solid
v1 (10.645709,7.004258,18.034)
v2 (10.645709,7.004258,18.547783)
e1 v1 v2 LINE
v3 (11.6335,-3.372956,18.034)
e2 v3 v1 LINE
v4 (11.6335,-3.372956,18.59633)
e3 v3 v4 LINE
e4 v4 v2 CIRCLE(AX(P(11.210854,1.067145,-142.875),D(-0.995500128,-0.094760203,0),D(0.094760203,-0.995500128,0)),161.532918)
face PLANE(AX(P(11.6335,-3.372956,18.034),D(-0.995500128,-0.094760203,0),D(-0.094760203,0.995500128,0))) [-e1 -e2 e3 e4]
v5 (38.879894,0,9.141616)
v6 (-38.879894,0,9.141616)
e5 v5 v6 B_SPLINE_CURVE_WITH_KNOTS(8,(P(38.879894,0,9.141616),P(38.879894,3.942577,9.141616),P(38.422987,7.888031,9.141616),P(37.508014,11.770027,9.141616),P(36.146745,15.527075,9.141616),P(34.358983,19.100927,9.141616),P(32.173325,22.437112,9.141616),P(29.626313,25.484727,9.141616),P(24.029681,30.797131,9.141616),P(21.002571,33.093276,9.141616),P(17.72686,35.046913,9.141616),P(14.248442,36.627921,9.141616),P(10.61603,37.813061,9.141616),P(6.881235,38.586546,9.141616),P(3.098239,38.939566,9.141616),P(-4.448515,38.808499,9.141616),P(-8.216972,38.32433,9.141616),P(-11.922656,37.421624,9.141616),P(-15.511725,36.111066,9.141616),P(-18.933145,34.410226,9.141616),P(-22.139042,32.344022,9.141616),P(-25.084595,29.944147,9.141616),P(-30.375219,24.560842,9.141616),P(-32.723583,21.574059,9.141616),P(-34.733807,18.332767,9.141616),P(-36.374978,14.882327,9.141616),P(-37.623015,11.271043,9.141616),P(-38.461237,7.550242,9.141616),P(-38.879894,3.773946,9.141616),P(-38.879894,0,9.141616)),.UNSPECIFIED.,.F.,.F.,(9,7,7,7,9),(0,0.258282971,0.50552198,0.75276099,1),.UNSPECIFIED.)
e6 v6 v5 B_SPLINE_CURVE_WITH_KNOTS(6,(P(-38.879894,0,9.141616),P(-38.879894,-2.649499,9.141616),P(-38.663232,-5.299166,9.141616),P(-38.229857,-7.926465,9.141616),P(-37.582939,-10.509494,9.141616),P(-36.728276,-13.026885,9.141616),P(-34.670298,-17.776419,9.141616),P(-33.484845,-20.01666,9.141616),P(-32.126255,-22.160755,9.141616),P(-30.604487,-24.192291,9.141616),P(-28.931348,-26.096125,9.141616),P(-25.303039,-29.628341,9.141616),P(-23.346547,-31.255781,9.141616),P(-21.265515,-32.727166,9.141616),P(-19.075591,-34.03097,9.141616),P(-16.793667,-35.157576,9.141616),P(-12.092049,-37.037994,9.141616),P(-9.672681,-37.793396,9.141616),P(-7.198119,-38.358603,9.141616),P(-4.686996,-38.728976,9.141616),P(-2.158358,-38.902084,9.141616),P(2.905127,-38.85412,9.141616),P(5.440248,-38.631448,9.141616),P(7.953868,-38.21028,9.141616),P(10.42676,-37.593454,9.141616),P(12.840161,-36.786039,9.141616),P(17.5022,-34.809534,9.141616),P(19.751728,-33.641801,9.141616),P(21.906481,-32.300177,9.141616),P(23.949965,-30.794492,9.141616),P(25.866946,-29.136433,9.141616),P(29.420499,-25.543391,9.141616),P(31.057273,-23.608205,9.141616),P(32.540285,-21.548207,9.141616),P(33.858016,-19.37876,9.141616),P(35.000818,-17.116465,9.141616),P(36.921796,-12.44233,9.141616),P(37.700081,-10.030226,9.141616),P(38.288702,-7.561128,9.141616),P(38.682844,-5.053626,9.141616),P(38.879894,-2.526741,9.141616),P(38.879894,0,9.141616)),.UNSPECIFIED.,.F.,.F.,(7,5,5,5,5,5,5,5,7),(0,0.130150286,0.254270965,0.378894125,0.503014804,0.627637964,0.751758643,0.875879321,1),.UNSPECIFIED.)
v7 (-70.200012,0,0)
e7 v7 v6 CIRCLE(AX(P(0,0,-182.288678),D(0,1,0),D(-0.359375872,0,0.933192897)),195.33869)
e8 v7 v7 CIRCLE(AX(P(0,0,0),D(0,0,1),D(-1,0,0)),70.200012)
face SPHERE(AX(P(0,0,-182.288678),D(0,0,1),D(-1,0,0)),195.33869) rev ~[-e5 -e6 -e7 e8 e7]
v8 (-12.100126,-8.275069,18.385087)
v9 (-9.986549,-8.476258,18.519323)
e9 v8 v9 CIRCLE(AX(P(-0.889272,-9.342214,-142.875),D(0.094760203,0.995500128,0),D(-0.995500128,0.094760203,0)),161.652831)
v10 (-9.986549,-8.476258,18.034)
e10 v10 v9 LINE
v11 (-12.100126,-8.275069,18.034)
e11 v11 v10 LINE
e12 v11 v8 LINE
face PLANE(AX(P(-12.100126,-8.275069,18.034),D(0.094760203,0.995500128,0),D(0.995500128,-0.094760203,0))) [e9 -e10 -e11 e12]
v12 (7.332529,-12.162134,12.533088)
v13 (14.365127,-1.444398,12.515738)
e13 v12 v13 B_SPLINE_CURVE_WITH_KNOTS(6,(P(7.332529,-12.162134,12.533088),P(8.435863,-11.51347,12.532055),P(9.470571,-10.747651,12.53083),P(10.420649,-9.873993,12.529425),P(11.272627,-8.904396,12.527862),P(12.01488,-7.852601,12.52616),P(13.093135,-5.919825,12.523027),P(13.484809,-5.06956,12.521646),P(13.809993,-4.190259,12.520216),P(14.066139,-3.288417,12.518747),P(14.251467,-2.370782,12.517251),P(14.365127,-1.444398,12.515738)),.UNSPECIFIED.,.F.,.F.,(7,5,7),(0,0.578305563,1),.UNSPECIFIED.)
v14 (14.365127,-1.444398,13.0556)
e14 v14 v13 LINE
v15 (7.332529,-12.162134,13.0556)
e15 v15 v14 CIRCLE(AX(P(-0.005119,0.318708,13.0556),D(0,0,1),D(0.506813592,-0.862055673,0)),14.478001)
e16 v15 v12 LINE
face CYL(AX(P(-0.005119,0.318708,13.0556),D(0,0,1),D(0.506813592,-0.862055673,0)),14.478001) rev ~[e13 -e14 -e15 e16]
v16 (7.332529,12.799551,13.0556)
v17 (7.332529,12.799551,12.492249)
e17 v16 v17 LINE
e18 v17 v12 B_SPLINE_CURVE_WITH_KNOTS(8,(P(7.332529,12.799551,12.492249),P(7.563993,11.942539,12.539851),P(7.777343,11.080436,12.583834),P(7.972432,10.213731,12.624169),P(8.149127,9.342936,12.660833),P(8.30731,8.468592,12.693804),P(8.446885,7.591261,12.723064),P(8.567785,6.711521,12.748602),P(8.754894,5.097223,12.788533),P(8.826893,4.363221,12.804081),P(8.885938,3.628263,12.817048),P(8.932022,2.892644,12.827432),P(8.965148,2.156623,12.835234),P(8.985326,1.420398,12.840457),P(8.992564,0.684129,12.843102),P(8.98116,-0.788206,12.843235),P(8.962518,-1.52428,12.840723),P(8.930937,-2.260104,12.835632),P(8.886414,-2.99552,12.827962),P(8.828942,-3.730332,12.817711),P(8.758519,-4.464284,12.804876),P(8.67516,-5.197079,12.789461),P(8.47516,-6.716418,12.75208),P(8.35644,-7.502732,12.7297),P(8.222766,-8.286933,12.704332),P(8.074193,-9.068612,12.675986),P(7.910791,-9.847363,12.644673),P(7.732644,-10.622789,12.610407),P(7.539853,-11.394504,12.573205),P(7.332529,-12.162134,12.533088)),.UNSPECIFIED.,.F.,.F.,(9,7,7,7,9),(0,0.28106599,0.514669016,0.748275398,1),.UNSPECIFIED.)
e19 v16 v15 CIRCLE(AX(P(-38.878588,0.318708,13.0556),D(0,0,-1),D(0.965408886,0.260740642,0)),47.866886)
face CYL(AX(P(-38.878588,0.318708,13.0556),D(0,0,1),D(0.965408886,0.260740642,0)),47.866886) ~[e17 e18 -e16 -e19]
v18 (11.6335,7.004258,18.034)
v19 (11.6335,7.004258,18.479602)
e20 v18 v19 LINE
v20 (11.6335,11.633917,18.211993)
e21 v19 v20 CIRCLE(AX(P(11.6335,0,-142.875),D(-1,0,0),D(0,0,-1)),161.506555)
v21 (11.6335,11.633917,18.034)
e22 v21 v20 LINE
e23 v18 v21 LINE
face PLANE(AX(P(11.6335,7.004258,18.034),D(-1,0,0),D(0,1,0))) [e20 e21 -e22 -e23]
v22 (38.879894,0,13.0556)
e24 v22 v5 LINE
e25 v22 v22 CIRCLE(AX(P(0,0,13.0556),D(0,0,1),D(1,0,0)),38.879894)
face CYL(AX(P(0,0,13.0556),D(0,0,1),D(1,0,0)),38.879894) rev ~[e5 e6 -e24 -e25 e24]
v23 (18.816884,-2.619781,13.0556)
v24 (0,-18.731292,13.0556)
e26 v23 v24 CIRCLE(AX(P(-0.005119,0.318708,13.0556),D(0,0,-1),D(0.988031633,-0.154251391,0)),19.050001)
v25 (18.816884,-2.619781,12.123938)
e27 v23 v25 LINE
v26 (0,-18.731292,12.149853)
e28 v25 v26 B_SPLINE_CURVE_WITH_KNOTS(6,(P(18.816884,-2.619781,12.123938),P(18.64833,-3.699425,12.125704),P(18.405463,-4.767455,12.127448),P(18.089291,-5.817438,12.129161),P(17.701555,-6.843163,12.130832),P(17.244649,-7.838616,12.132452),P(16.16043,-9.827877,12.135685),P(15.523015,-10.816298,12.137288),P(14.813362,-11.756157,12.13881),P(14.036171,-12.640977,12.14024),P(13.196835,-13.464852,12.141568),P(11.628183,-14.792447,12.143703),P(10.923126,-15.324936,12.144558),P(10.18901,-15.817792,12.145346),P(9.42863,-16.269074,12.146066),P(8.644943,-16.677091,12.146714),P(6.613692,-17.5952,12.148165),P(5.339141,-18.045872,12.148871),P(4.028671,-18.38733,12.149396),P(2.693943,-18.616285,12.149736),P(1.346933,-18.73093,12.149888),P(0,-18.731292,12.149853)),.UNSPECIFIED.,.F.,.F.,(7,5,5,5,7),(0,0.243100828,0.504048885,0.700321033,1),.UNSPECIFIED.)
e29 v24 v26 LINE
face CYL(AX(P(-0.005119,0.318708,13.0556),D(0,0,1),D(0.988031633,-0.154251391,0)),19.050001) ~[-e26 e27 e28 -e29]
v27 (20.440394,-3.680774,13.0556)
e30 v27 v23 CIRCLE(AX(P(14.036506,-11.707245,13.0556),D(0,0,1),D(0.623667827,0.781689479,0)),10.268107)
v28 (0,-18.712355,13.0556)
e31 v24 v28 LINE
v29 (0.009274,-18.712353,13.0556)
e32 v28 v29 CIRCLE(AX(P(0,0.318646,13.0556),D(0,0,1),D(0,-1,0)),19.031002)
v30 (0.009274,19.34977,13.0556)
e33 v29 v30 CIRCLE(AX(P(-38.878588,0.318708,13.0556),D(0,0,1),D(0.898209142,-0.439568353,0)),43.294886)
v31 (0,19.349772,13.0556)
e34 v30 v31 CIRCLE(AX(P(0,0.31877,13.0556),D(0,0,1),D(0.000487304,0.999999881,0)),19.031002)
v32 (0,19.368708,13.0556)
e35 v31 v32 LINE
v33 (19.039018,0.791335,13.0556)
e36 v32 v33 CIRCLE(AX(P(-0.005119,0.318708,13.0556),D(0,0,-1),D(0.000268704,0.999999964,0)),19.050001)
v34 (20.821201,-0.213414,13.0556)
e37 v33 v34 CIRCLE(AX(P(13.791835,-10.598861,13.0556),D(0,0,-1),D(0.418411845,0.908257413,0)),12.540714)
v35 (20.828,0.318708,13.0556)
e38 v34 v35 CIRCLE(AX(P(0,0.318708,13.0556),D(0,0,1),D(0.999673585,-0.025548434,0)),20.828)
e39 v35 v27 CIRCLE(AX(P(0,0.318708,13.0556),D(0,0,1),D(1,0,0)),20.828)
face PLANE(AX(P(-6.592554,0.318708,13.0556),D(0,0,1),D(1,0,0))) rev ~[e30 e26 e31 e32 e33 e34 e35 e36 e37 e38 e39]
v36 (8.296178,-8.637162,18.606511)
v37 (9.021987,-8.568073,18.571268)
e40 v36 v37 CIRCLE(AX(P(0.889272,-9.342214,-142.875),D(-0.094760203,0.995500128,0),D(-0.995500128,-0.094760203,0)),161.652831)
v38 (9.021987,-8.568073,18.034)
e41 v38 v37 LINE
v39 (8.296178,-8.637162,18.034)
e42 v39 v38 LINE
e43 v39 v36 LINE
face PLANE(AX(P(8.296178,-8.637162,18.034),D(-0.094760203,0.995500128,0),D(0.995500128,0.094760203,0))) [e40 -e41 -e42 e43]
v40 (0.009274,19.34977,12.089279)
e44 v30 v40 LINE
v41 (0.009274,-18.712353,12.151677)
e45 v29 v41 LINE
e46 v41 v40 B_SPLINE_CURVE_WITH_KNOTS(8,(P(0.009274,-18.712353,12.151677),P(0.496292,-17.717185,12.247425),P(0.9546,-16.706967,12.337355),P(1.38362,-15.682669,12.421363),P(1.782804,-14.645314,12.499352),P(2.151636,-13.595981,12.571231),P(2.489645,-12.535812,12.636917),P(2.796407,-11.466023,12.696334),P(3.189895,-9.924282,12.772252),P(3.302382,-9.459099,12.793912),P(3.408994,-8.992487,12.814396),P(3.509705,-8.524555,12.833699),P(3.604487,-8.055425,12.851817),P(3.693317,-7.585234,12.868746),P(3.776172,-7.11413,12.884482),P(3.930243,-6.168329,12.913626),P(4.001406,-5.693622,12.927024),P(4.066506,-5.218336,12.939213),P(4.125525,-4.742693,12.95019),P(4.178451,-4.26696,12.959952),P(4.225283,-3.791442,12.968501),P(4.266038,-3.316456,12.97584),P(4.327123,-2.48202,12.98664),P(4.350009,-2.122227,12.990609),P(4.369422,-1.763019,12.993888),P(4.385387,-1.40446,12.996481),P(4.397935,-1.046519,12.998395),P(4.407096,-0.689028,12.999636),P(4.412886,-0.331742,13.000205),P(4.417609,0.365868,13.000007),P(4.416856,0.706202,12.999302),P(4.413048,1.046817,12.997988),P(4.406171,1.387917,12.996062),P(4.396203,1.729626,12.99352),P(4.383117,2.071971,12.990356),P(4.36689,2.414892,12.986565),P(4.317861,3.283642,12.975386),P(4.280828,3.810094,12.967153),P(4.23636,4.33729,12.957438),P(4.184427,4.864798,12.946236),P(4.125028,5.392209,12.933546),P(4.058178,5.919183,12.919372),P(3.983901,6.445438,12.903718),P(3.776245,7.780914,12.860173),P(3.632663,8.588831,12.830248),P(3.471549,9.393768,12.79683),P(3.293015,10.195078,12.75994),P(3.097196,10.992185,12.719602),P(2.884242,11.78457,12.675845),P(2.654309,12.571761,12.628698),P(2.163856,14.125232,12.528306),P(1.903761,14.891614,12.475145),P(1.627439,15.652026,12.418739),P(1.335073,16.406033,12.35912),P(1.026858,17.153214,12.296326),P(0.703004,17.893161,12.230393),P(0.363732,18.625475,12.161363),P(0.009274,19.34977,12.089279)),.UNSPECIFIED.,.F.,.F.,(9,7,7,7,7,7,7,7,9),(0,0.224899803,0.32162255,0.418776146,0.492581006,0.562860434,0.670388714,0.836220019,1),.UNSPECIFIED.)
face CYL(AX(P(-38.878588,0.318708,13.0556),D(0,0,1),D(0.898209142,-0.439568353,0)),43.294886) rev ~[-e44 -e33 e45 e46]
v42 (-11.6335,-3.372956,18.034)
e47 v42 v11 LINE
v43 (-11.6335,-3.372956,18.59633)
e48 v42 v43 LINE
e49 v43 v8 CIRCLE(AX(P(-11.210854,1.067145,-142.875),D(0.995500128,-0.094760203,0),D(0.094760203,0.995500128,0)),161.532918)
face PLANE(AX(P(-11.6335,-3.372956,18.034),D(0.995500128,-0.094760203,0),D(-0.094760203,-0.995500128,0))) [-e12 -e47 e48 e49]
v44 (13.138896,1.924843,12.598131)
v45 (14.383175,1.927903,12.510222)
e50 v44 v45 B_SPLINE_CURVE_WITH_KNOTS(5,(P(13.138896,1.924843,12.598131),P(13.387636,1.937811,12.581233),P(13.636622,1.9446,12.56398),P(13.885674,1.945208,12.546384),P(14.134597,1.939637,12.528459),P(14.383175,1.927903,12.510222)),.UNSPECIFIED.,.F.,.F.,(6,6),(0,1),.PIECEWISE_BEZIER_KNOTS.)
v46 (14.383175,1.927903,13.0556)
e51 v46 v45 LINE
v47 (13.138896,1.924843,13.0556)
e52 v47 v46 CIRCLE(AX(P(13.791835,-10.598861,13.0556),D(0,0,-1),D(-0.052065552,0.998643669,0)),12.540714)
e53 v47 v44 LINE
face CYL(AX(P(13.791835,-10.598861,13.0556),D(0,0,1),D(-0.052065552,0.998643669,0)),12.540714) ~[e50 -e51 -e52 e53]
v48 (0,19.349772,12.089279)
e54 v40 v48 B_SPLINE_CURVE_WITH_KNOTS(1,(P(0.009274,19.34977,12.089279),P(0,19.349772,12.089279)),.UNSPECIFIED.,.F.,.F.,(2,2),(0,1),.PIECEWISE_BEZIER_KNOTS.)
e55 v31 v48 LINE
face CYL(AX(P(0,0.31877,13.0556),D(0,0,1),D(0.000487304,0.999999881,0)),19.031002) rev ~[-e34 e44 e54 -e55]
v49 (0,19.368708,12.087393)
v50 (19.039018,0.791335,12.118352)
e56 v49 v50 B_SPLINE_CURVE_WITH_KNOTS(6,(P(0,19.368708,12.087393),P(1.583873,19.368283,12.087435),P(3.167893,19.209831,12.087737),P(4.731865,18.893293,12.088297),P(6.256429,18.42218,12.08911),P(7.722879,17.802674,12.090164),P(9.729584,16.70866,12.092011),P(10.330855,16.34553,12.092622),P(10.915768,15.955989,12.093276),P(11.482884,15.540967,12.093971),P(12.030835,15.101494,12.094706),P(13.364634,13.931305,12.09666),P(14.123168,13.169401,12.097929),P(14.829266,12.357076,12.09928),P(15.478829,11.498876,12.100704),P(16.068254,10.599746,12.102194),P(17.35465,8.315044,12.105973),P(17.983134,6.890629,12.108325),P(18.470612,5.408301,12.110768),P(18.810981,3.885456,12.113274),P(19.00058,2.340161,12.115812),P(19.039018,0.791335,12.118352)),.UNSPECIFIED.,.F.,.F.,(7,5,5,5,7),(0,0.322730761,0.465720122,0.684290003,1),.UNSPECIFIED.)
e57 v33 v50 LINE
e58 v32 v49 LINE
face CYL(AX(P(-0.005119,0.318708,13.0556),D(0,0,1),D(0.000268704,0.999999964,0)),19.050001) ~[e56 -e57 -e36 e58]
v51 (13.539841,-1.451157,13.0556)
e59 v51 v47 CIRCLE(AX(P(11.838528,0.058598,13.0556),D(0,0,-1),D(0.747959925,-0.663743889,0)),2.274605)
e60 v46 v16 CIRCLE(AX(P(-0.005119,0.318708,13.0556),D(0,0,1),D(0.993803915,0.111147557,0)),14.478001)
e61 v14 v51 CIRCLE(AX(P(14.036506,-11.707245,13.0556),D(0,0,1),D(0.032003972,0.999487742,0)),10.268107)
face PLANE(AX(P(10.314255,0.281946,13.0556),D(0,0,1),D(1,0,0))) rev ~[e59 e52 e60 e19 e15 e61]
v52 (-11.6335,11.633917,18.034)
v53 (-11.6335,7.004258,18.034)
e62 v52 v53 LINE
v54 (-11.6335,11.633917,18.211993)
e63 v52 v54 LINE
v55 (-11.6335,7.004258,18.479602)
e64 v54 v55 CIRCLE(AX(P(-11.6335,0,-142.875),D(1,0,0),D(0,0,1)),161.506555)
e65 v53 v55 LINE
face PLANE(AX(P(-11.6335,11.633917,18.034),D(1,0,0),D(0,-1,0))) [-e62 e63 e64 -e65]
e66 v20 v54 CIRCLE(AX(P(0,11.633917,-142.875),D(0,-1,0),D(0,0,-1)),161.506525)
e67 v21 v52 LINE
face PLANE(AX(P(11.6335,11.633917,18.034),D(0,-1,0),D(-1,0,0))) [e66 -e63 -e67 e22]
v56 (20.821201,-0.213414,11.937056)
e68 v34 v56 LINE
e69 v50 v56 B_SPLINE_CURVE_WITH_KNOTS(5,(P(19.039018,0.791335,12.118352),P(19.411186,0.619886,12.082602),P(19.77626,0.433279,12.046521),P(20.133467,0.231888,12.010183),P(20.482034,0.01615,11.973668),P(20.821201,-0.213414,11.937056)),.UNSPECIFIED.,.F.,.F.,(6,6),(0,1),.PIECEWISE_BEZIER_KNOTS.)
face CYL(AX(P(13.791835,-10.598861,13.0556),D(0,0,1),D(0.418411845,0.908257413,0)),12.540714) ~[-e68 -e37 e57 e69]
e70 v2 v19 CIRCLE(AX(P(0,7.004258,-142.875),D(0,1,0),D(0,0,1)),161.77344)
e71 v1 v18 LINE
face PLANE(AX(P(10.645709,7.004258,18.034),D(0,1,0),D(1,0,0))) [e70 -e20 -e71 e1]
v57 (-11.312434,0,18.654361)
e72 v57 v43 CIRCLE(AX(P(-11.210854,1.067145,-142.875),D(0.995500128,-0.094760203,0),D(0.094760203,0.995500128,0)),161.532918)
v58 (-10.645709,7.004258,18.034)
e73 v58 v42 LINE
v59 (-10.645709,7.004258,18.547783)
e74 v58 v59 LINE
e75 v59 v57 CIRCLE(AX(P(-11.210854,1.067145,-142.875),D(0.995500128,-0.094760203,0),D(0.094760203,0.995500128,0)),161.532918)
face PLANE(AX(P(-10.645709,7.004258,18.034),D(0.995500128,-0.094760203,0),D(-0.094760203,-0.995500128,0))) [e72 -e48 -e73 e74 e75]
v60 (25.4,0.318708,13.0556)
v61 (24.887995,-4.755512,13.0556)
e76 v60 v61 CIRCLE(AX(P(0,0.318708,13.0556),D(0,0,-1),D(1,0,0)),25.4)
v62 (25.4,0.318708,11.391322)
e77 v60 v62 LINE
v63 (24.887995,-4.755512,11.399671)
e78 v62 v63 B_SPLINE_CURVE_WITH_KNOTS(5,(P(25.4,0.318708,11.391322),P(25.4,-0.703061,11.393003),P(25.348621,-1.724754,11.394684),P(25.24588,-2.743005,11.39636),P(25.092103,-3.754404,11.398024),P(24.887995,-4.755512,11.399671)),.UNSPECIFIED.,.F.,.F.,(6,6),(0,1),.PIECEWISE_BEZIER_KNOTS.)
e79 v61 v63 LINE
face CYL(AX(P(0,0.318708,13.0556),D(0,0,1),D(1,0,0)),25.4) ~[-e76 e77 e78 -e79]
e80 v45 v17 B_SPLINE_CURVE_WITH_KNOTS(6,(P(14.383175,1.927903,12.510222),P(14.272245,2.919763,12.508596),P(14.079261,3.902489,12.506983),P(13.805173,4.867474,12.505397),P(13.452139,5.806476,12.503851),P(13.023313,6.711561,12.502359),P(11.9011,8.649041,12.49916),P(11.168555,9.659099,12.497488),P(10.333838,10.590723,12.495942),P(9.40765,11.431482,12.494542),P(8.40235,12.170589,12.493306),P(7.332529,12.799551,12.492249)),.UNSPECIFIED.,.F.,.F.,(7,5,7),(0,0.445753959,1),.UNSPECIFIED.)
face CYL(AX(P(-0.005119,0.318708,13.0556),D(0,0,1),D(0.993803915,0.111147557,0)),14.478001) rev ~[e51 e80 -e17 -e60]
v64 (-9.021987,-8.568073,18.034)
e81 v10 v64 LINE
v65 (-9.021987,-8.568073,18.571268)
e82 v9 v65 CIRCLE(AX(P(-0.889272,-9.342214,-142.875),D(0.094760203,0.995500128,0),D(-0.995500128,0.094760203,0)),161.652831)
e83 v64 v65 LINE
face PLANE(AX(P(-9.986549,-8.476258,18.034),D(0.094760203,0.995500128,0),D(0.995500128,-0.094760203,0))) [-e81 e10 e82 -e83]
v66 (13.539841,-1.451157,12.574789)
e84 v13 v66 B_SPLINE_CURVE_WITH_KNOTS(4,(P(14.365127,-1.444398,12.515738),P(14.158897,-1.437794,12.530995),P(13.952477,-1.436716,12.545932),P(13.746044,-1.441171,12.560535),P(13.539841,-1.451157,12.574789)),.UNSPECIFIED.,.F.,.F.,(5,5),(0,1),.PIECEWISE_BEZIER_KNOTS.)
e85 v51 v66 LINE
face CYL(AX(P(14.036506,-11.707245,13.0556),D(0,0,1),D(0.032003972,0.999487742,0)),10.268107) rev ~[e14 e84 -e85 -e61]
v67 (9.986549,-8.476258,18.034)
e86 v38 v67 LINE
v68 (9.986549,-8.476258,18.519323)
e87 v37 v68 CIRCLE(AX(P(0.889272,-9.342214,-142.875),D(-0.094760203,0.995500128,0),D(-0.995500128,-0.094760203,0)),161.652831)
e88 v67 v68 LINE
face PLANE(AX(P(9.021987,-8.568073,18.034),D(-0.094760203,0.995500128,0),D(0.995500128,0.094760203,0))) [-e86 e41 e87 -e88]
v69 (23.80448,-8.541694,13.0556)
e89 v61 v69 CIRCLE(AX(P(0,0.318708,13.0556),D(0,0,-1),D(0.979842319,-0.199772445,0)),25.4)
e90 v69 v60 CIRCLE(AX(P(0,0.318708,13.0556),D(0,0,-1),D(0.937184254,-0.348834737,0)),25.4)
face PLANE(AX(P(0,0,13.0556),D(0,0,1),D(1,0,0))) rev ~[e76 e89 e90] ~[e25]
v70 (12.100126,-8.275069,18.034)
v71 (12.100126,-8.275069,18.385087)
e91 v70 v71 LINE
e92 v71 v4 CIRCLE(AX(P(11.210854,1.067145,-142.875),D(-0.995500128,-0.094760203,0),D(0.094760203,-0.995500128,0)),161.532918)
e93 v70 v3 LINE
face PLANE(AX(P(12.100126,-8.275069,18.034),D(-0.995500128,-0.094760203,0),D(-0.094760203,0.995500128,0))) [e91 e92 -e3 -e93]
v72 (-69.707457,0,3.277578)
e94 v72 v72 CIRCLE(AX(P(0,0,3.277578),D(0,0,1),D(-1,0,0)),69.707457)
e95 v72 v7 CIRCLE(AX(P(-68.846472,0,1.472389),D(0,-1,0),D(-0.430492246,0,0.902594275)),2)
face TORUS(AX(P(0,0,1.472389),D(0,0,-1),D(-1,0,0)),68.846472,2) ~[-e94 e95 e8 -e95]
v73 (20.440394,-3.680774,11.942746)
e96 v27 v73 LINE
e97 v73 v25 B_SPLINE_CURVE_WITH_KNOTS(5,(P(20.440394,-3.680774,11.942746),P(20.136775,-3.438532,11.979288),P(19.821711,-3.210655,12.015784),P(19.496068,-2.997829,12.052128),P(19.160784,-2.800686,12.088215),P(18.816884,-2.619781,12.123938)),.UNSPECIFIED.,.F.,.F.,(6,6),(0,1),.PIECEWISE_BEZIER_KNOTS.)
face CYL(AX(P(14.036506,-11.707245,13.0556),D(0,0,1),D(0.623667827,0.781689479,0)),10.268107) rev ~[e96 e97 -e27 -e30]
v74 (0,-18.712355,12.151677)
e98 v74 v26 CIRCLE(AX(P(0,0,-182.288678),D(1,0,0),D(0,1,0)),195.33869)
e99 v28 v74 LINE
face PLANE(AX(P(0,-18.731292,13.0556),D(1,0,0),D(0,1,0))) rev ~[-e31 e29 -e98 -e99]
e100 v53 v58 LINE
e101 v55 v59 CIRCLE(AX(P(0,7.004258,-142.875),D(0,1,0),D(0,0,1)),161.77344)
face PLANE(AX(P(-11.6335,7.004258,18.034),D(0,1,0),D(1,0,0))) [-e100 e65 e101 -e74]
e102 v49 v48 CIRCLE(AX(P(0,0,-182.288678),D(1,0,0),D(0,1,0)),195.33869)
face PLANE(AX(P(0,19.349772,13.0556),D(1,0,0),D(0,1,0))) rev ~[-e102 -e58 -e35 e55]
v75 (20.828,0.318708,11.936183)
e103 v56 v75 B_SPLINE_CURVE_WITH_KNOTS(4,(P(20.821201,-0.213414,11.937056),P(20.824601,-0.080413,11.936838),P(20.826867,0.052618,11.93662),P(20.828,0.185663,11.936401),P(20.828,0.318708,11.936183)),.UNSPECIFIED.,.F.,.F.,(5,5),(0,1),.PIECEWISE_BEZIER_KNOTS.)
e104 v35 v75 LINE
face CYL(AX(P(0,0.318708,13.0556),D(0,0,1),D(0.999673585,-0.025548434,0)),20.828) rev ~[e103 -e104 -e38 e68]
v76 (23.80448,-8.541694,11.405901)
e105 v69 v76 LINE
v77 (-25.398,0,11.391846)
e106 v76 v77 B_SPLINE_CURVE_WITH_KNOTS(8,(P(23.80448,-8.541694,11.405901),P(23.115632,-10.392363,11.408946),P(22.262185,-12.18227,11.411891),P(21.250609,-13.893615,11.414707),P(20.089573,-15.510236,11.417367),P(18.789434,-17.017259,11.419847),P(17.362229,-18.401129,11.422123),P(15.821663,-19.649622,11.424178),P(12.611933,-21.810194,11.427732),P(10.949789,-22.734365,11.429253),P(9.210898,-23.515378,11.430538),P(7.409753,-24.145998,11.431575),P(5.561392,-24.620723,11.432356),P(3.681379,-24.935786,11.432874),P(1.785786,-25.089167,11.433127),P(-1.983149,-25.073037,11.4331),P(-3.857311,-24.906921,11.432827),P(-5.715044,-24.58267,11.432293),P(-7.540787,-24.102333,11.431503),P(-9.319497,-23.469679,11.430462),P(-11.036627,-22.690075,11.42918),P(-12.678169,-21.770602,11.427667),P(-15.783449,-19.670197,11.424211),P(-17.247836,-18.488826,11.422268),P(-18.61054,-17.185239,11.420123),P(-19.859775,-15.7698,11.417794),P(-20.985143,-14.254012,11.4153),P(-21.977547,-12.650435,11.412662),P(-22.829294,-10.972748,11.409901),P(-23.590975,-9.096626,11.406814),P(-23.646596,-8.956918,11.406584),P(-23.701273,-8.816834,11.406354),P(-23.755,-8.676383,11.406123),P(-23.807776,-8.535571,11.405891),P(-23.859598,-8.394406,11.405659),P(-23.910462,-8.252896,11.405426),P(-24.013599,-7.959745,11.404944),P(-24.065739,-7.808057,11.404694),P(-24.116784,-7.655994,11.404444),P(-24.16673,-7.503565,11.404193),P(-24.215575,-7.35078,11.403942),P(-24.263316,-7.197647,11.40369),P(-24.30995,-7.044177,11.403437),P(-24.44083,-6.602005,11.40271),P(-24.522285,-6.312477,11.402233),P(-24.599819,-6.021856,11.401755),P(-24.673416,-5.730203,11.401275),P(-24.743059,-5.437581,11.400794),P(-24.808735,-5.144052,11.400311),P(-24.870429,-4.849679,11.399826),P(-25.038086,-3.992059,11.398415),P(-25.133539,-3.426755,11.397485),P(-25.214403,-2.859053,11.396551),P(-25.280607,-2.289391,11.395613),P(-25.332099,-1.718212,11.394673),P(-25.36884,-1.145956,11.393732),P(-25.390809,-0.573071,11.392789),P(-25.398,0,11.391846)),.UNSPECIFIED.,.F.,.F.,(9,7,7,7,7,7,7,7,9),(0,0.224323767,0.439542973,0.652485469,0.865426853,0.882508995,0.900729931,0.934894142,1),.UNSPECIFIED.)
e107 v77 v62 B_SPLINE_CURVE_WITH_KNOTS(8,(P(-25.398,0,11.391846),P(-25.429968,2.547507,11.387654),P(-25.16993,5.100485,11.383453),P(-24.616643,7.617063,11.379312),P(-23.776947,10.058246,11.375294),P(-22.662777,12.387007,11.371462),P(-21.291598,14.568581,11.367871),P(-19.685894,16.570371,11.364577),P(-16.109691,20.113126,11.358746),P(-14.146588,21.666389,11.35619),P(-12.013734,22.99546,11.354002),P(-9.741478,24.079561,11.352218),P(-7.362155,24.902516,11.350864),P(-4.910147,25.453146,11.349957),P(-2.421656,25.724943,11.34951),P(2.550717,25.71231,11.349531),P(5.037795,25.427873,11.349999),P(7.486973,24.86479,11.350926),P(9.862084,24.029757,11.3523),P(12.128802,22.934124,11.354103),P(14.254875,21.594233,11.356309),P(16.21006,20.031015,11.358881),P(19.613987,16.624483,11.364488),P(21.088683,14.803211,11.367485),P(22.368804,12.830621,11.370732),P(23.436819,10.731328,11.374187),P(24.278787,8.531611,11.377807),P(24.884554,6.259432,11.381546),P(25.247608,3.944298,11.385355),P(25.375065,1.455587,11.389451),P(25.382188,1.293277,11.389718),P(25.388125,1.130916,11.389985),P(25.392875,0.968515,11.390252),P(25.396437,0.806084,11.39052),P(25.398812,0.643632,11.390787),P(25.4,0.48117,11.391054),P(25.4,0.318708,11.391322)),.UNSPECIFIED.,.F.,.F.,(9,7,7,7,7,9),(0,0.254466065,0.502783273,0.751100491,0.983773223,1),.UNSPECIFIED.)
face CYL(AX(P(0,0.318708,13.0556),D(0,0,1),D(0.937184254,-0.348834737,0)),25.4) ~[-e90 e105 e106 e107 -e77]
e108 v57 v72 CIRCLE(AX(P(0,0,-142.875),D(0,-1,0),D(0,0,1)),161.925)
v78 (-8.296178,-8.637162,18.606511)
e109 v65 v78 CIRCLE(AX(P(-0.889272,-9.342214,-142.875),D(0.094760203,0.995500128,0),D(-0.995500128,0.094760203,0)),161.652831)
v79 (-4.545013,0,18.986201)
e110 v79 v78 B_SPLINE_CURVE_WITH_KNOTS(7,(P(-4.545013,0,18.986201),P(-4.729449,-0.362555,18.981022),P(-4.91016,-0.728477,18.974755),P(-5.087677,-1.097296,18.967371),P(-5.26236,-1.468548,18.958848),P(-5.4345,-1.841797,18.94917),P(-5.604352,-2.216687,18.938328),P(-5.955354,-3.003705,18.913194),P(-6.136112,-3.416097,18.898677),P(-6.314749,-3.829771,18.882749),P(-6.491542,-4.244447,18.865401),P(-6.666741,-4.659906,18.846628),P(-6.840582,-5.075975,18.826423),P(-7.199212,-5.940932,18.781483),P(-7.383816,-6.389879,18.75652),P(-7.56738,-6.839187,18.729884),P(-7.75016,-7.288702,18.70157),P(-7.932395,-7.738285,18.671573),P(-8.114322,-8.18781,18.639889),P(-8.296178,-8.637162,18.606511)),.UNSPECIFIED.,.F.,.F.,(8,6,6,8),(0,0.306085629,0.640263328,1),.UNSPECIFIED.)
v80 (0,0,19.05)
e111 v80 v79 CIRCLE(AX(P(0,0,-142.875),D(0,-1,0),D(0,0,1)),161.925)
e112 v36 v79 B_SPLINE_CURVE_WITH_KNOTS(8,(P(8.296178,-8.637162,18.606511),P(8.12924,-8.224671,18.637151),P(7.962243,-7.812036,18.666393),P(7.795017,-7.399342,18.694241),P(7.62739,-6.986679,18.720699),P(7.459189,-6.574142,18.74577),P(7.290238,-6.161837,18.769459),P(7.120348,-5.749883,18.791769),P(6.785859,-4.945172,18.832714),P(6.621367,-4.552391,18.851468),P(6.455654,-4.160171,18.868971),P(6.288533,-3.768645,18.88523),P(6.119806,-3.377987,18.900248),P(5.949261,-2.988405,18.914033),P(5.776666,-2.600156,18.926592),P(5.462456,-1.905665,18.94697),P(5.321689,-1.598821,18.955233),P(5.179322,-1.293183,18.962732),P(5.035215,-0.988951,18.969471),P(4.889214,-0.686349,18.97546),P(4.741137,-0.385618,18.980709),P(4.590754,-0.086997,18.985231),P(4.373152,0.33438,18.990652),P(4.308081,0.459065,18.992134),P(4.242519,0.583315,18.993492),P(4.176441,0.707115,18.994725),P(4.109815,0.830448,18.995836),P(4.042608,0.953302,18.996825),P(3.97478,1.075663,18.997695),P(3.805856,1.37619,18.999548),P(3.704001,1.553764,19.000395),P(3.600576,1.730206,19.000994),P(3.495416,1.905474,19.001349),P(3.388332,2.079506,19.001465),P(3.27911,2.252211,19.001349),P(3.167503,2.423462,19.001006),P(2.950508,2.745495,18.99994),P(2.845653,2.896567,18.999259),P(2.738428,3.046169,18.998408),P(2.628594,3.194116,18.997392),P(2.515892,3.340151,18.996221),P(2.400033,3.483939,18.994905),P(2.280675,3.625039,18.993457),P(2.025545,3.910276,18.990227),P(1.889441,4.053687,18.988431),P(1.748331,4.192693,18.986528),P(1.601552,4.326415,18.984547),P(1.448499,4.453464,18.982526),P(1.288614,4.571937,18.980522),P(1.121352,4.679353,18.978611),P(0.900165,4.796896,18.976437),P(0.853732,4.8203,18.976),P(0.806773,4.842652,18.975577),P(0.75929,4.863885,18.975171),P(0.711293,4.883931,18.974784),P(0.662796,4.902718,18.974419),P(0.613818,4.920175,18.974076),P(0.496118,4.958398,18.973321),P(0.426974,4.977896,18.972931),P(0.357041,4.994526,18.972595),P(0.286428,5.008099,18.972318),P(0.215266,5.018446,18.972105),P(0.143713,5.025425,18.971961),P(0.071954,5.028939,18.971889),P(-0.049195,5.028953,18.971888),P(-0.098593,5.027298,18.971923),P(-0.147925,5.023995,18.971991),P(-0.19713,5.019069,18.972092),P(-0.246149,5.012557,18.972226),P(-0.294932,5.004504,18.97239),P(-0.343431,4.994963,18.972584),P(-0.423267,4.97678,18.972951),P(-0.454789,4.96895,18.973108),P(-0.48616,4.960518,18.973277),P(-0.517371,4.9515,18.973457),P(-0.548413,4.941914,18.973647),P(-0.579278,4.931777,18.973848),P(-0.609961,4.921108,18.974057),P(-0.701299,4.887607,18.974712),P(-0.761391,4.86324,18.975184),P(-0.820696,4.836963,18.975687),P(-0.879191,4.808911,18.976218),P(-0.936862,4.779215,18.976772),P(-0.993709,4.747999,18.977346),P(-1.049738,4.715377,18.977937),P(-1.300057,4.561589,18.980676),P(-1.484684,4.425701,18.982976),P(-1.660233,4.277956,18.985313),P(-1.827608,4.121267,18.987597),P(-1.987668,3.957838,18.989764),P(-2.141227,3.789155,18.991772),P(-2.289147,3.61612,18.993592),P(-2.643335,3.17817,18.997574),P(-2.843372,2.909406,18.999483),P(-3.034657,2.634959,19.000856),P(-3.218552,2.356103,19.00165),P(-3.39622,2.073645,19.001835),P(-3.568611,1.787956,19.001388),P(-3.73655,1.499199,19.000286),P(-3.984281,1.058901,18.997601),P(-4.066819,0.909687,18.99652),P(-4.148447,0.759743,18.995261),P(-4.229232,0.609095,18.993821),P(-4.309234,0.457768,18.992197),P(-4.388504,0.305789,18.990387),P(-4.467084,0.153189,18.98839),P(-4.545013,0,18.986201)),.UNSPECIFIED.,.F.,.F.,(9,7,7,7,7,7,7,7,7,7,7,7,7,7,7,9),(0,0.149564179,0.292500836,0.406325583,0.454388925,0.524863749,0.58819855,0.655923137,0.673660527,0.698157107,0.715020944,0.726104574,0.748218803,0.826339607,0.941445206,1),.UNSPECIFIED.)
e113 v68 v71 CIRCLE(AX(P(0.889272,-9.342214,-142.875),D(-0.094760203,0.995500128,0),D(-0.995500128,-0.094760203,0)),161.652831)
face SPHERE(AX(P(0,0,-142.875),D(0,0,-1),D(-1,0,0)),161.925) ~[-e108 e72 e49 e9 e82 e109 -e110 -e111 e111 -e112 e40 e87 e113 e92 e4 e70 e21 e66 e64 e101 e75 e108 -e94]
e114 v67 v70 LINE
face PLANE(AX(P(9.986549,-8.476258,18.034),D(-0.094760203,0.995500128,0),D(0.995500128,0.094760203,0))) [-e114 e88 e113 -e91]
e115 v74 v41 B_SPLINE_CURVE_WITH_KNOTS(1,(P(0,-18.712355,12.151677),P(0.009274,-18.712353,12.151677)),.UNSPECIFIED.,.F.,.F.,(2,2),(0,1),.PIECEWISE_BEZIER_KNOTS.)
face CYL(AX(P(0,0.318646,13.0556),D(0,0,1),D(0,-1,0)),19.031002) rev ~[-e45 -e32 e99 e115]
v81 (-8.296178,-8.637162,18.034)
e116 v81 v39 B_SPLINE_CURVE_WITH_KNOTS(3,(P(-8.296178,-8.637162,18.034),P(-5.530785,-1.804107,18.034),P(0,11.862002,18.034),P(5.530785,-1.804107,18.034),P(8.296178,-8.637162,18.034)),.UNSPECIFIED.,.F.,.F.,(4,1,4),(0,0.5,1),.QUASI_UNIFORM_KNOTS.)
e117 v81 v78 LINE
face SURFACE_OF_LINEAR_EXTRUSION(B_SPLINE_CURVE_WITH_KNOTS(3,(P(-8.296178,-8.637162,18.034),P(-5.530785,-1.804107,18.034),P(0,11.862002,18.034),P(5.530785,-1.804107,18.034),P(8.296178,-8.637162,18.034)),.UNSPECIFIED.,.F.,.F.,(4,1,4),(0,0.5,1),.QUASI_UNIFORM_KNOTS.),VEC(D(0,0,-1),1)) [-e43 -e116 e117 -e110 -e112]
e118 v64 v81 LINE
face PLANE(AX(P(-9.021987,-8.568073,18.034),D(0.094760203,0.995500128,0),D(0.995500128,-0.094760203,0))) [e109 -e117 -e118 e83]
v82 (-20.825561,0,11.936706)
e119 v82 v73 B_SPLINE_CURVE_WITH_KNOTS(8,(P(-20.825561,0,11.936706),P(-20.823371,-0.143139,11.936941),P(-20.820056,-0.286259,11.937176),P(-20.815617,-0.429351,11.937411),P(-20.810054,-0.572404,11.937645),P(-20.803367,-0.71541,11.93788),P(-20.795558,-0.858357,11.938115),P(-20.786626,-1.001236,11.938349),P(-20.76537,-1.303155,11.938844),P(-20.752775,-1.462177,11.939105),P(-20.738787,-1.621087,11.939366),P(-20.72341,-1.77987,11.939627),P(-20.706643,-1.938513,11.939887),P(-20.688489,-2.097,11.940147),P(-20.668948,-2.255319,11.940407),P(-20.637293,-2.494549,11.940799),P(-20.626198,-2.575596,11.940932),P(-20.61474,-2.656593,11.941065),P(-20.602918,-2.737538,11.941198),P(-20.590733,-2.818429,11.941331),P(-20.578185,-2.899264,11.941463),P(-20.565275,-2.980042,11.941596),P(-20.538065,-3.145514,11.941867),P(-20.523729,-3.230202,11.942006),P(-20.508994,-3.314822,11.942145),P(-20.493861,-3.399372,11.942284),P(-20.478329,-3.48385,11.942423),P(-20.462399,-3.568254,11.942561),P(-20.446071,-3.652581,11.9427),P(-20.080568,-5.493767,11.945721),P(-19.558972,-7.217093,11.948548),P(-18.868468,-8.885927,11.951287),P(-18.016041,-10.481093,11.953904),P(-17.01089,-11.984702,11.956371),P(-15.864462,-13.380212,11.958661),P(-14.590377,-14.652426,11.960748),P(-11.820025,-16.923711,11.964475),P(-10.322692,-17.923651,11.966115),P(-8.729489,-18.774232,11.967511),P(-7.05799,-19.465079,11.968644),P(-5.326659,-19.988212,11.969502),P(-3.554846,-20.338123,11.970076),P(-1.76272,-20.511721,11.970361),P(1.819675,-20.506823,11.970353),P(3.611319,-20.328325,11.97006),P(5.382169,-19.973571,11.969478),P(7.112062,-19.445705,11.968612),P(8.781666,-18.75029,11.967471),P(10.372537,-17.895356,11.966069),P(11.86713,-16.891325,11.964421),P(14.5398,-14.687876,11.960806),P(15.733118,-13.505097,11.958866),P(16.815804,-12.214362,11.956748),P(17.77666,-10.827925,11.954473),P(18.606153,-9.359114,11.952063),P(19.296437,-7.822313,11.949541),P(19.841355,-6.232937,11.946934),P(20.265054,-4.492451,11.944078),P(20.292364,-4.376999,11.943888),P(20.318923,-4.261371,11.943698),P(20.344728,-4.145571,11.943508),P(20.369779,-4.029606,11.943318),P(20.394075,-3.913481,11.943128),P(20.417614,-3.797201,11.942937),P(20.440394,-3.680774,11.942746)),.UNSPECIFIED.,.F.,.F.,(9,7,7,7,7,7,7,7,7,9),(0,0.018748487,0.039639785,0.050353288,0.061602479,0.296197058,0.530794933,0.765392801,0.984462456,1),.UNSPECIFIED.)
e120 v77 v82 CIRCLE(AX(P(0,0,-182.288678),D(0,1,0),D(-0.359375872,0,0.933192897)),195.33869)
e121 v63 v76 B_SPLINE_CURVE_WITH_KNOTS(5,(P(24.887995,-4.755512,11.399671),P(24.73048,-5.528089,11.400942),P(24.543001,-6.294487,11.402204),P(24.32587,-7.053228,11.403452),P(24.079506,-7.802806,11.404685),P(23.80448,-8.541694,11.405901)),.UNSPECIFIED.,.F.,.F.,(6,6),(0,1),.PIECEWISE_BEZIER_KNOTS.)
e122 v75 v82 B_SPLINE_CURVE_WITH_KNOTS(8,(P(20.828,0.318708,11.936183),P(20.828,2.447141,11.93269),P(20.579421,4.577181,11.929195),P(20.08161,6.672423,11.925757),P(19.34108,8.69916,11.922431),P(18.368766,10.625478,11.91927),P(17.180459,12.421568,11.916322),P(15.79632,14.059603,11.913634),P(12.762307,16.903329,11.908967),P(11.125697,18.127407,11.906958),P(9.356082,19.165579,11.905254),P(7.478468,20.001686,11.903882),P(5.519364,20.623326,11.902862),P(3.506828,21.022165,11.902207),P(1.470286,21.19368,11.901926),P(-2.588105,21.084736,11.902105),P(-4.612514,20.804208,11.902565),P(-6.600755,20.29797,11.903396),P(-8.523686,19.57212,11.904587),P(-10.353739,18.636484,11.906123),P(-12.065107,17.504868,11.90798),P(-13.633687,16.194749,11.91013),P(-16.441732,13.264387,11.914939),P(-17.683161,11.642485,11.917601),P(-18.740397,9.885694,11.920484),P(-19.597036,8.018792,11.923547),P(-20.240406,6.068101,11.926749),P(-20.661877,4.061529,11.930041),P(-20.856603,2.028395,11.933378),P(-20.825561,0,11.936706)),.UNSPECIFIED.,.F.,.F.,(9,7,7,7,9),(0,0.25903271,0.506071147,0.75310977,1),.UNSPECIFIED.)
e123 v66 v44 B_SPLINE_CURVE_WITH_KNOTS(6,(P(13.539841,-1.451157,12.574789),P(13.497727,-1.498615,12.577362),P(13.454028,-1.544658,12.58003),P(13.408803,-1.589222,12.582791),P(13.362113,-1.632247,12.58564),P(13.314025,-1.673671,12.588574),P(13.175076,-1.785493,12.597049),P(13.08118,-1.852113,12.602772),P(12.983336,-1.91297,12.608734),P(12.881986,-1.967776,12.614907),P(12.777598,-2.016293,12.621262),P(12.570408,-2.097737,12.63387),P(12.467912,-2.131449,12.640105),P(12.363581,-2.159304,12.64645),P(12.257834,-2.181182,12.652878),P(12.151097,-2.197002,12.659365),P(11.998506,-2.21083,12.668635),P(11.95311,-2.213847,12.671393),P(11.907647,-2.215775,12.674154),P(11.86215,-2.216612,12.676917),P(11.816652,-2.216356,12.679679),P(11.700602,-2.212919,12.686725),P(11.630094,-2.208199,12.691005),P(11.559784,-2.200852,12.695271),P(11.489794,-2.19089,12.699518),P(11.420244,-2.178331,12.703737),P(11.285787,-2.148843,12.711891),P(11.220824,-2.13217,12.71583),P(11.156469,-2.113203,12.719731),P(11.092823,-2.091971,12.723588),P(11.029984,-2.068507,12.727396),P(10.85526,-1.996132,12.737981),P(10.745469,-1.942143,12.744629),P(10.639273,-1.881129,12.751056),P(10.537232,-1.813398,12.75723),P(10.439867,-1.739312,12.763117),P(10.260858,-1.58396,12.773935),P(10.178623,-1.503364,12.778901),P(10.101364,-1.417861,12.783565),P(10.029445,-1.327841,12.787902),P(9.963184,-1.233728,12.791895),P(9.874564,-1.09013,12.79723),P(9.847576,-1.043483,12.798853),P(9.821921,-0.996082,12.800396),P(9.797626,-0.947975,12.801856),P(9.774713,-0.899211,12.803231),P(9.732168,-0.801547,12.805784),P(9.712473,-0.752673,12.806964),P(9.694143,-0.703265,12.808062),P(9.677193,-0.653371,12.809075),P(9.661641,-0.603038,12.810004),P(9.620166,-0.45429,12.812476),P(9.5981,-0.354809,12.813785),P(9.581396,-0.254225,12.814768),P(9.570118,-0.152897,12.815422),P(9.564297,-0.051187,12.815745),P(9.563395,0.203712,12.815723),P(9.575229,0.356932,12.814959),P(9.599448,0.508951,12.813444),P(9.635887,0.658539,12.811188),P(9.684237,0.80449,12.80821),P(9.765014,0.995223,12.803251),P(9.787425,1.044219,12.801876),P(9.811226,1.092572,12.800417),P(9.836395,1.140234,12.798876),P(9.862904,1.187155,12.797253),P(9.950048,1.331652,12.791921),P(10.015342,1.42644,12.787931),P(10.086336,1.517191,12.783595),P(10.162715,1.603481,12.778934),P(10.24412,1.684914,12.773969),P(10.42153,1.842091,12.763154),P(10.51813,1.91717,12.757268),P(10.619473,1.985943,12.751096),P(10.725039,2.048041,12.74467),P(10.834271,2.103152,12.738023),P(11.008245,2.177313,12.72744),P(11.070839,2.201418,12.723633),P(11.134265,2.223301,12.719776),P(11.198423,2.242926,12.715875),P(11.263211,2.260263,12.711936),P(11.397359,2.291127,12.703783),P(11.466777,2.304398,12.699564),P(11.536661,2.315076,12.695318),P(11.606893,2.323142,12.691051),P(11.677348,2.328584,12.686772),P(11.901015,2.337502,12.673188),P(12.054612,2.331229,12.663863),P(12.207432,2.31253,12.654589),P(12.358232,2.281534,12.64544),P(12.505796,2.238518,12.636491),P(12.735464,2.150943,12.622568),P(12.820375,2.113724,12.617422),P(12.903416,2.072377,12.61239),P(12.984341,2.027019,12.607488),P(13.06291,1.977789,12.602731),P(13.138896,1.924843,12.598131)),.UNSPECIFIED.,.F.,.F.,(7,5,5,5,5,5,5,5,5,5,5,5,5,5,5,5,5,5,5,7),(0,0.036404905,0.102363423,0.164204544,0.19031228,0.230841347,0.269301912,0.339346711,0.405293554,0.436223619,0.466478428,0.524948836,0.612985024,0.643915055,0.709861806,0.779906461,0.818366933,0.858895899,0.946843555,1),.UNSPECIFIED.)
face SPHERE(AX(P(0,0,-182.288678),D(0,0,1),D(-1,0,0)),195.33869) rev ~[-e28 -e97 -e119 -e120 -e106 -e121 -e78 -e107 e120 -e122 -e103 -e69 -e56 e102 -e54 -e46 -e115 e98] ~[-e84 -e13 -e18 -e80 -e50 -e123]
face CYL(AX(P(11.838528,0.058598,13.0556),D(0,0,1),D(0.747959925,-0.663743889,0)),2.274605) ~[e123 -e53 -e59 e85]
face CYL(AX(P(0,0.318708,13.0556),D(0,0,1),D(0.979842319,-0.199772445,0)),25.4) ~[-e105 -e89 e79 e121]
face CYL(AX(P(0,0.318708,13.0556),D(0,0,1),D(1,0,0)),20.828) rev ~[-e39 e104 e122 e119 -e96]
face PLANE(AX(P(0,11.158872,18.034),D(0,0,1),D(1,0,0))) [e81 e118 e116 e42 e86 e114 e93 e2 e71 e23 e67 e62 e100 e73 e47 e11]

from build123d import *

# Parameters (mm, degrees)
F6_R      = 38.8798944489
F7_DEPTH  = 25.146
F9_DEPTH  = 26.67
F10_W     = 18.4118933976
F10_H     = 2.2933566943
F11_DEPTH = 23.368


# Not quite as in the source:
# - a fillet or chamfer that OpenCascade refuses, or shapes differently, is made with other operations: its cross-section is extruded or revolved along the edge and cut away or added


with BuildPart() as f2:
    # F0 (on Front) → F2 (revolve)
    with BuildSketch(Plane.XZ):
        with BuildLine():
            ThreePointArc((-70.200012, 0), (-35.7013462561, 9.759799439), (0, 13.050012))
            Line((0, 13.050012), (0, 19.05))
            ThreePointArc((0, 19.05), (-39.272581084, 14.215324336), (-76.2, 0))
            Line((-76.2, 0), (-70.200012, 0))
        make_face()
    revolve(axis=Axis((0, 0, 24.1573229432), (0, 0, 1)))

    # F3: fillet of radius 2 on 1 edges, made by hand

    # F3_s1 → F3_t2 (revolve, cut)
    with BuildSketch(Plane.XZ):
        with BuildLine():
            ThreePointArc((-69.7074569816, 3.2775780346), (-70.8242638288, 1.7696123233), (-70.200012, 0))
            Line((-70.200012, 0), (-76.2, 0))
            ThreePointArc((-76.2, 0), (-72.9721325586, 1.6752455717), (-69.7074569816, 3.2775780346))
        make_face()
    revolve(axis=Axis((0, 0, 0), (0, 0, 1)), mode=Mode.SUBTRACT)

    # F6 (on offset) → F7 (cut)
    with BuildSketch(Plane.XY.offset(13.0556)):
        Circle(F6_R)
        with BuildLine():
            ThreePointArc((25.4, 0.3187083348), (25.2716745644, -2.231284746), (24.8879949046, -4.7555117659))
            ThreePointArc((24.8879949046, -4.7555117659), (24.4197271347, -6.6696338625), (23.8044800528, -8.5416939933))
            ThreePointArc((23.8044800528, -8.5416939933), (-24.9979378484, 4.8201640248), (25.4, 0.3187083348))
        make_face(mode=Mode.SUBTRACT)
        with BuildLine():
            Line((0, 0.3187083348), (0, 19.3497721271))
            ThreePointArc((0, 19.3497721271), (-19.0310637922, 0.3187083348), (0, -18.7123554574))
            Line((0, -18.7123554574), (0, 0.3187083348))
        make_face()
        with BuildLine():
            Line((0, 19.3497721271), (0, 19.3687083348))
            ThreePointArc((0, 19.3687083348), (13.2989496278, 13.9533806489), (19.0390180892, 0.7913348654))
            ThreePointArc((19.0390180892, 0.7913348654), (19.9506333706, 0.3253641448), (20.8212014385, -0.2134144487))
            ThreePointArc((20.8212014385, -0.2134144487), (20.8263002903, 0.0526252288), (20.828, 0.3187083348))
            ThreePointArc((20.828, 0.3187083348), (-20.7308721477, 2.3278185842), (20.4403944696, -3.6807738728))
            ThreePointArc((20.4403944696, -3.6807738728), (19.6537458396, -3.1118600746), (18.8168844801, -2.6197807703))
            ThreePointArc((18.8168844801, -2.6197807703), (12.3848096584, -14.1516820769), (0, -18.7312916652))
            Line((0, -18.7312916652), (0, -18.7123554574))
            ThreePointArc((0, -18.7123554574), (-19.0310637922, 0.3187083348), (0, 19.3497721271))
        make_face()
        with BuildLine():
            ThreePointArc((0.0092738827, 19.3497698675), (0.0046369415, 19.3497715622), (0, 19.3497721271))
            Line((0, 19.3497721271), (0, 0.3187083348))
            Line((0, 0.3187083348), (0, -18.7123554574))
            ThreePointArc((0, -18.7123554574), (0.0046369415, -18.7123548925), (0.0092738827, -18.7123531978))
            ThreePointArc((0.0092738827, -18.7123531978), (4.4162974191, 0.3187083348), (0.0092738827, 19.3497698675))
        make_face()
        with BuildLine():
            ThreePointArc((13.1388957402, 1.9248430338), (13.7609973094, 1.9418144736), (14.3831748206, 1.9279027252))
            ThreePointArc((14.3831748206, 1.9279027252), (12.1419924656, 8.1965372147), (7.3325286529, 12.7995508523))
            ThreePointArc((7.3325286529, 12.7995508523), (8.9882975444, 0.3187083348), (7.3325286529, -12.1621341826))
            ThreePointArc((7.3325286529, -12.1621341826), (12.0996579985, -7.6240165515), (14.3651267069, -1.4443980064))
            ThreePointArc((14.3651267069, -1.4443980064), (13.9524158986, -1.4394824186), (13.5398409591, -1.4511569053))
            ThreePointArc((13.5398409591, -1.4511569053), (9.5797965511, -0.2096564514), (13.1388957402, 1.9248430338))
        make_face()
    extrude(amount=-F7_DEPTH, mode=Mode.SUBTRACT)

    # F8 (on offset) → F9 (cut)
    with BuildSketch(Plane.XY.offset(18.034)):
        Polygon((-11.6335004568, 11.633916758), (-11.6335004568, 10.6838271022), (0, 10.6838271022), (11.6335004568, 10.6838271022), (11.6335004568, 11.633916758), align=None)
        Polygon((0, 10.6838271022), (-11.6335004568, 10.6838271022), (-11.6335004568, 7.7160974033), (-10.5779496953, 7.7160974033), (-8.4452219732, 7.7160974033), (-7.4719206453, 7.7160974033), (-6.7395351815, 7.7160974033), (0, 7.7160974033), align=None)
        Polygon((11.6335004568, 10.6838271022), (0, 10.6838271022), (0, 7.7160974033), (6.7395351815, 7.7160974033), (7.4719206453, 7.7160974033), (8.4452219732, 7.7160974033), (10.5779496953, 7.7160974033), (11.6335004568, 7.7160974033), align=None)
        Polygon((-10.5779496953, 7.7160974033), (-11.6335004568, 7.7160974033), (-11.6335004568, 7.0042582229), (-10.6457086273, 7.0042582229), align=None)
        Polygon((-8.4452219732, 7.7160974033), (-10.5779496953, 7.7160974033), (-10.6457086273, 7.0042582229), (-8.5129809052, 7.0042582229), align=None)
        Polygon((11.6335004568, 7.0042582229), (11.6335004568, 7.7160974033), (10.5779496953, 7.7160974033), (10.6457086273, 7.0042582229), align=None)
        Polygon((-8.5129809052, 7.0042582229), (-10.6457086273, 7.0042582229), (-11.6335004568, -3.3729556017), (-12.100125514, -8.275069438), (-9.9865486123, -8.4762577367), align=None)
        Polygon((-8.2961780285, -8.637161644), (-6.8072941135, 7.0042582229), (-7.5396795774, 7.0042582229), (-9.0219870399, -8.5680729442), align=None)
        with BuildLine():
            Line((6.8072941135, 7.0042582229), (-6.8072941135, 7.0042582229))
            Line((-6.8072941135, 7.0042582229), (-8.2961780285, -8.637161644))
            add(Edge.make_bspline(
                [(-8.2961780285, -8.637161644), (-5.5307853524, -1.8041071938), (0, 11.8620017068), (5.5307853524, -1.8041071938), (8.2961780285, -8.637161644)],
                knots=[0, 0, 0, 0, 0.5, 1, 1, 1, 1], degree=3))
            Line((8.2961780285, -8.637161644), (6.8072941135, 7.0042582229))
        make_face()
        Polygon((7.5396795774, 7.0042582229), (6.8072941135, 7.0042582229), (8.2961780285, -8.637161644), (9.0219870399, -8.5680729442), align=None)
        Polygon((10.6457086273, 7.0042582229), (10.5779496953, 7.7160974033), (8.4452219732, 7.7160974033), (8.5129809052, 7.0042582229), align=None)
        Polygon((-7.5396795774, 7.0042582229), (-8.5129809052, 7.0042582229), (-9.9865486123, -8.4762577367), (-9.0219870399, -8.5680729442), align=None)
        Polygon((8.5129809052, 7.0042582229), (7.5396795774, 7.0042582229), (9.0219870399, -8.5680729442), (9.9865486123, -8.4762577367), align=None)
        Polygon((11.6335004568, -3.3729556017), (10.6457086273, 7.0042582229), (8.5129809052, 7.0042582229), (9.9865486123, -8.4762577367), (12.100125514, -8.275069438), align=None)
    extrude(amount=F9_DEPTH, mode=Mode.SUBTRACT)

    # F10 (on offset) → F11 (cut)
    with BuildSketch(Plane.XY.offset(18.034)):
        with Locations((-0.0296542421, 7.2142141871)):
            Rectangle(F10_W, F10_H)
    extrude(amount=F11_DEPTH, mode=Mode.SUBTRACT)


solid = f2.part
